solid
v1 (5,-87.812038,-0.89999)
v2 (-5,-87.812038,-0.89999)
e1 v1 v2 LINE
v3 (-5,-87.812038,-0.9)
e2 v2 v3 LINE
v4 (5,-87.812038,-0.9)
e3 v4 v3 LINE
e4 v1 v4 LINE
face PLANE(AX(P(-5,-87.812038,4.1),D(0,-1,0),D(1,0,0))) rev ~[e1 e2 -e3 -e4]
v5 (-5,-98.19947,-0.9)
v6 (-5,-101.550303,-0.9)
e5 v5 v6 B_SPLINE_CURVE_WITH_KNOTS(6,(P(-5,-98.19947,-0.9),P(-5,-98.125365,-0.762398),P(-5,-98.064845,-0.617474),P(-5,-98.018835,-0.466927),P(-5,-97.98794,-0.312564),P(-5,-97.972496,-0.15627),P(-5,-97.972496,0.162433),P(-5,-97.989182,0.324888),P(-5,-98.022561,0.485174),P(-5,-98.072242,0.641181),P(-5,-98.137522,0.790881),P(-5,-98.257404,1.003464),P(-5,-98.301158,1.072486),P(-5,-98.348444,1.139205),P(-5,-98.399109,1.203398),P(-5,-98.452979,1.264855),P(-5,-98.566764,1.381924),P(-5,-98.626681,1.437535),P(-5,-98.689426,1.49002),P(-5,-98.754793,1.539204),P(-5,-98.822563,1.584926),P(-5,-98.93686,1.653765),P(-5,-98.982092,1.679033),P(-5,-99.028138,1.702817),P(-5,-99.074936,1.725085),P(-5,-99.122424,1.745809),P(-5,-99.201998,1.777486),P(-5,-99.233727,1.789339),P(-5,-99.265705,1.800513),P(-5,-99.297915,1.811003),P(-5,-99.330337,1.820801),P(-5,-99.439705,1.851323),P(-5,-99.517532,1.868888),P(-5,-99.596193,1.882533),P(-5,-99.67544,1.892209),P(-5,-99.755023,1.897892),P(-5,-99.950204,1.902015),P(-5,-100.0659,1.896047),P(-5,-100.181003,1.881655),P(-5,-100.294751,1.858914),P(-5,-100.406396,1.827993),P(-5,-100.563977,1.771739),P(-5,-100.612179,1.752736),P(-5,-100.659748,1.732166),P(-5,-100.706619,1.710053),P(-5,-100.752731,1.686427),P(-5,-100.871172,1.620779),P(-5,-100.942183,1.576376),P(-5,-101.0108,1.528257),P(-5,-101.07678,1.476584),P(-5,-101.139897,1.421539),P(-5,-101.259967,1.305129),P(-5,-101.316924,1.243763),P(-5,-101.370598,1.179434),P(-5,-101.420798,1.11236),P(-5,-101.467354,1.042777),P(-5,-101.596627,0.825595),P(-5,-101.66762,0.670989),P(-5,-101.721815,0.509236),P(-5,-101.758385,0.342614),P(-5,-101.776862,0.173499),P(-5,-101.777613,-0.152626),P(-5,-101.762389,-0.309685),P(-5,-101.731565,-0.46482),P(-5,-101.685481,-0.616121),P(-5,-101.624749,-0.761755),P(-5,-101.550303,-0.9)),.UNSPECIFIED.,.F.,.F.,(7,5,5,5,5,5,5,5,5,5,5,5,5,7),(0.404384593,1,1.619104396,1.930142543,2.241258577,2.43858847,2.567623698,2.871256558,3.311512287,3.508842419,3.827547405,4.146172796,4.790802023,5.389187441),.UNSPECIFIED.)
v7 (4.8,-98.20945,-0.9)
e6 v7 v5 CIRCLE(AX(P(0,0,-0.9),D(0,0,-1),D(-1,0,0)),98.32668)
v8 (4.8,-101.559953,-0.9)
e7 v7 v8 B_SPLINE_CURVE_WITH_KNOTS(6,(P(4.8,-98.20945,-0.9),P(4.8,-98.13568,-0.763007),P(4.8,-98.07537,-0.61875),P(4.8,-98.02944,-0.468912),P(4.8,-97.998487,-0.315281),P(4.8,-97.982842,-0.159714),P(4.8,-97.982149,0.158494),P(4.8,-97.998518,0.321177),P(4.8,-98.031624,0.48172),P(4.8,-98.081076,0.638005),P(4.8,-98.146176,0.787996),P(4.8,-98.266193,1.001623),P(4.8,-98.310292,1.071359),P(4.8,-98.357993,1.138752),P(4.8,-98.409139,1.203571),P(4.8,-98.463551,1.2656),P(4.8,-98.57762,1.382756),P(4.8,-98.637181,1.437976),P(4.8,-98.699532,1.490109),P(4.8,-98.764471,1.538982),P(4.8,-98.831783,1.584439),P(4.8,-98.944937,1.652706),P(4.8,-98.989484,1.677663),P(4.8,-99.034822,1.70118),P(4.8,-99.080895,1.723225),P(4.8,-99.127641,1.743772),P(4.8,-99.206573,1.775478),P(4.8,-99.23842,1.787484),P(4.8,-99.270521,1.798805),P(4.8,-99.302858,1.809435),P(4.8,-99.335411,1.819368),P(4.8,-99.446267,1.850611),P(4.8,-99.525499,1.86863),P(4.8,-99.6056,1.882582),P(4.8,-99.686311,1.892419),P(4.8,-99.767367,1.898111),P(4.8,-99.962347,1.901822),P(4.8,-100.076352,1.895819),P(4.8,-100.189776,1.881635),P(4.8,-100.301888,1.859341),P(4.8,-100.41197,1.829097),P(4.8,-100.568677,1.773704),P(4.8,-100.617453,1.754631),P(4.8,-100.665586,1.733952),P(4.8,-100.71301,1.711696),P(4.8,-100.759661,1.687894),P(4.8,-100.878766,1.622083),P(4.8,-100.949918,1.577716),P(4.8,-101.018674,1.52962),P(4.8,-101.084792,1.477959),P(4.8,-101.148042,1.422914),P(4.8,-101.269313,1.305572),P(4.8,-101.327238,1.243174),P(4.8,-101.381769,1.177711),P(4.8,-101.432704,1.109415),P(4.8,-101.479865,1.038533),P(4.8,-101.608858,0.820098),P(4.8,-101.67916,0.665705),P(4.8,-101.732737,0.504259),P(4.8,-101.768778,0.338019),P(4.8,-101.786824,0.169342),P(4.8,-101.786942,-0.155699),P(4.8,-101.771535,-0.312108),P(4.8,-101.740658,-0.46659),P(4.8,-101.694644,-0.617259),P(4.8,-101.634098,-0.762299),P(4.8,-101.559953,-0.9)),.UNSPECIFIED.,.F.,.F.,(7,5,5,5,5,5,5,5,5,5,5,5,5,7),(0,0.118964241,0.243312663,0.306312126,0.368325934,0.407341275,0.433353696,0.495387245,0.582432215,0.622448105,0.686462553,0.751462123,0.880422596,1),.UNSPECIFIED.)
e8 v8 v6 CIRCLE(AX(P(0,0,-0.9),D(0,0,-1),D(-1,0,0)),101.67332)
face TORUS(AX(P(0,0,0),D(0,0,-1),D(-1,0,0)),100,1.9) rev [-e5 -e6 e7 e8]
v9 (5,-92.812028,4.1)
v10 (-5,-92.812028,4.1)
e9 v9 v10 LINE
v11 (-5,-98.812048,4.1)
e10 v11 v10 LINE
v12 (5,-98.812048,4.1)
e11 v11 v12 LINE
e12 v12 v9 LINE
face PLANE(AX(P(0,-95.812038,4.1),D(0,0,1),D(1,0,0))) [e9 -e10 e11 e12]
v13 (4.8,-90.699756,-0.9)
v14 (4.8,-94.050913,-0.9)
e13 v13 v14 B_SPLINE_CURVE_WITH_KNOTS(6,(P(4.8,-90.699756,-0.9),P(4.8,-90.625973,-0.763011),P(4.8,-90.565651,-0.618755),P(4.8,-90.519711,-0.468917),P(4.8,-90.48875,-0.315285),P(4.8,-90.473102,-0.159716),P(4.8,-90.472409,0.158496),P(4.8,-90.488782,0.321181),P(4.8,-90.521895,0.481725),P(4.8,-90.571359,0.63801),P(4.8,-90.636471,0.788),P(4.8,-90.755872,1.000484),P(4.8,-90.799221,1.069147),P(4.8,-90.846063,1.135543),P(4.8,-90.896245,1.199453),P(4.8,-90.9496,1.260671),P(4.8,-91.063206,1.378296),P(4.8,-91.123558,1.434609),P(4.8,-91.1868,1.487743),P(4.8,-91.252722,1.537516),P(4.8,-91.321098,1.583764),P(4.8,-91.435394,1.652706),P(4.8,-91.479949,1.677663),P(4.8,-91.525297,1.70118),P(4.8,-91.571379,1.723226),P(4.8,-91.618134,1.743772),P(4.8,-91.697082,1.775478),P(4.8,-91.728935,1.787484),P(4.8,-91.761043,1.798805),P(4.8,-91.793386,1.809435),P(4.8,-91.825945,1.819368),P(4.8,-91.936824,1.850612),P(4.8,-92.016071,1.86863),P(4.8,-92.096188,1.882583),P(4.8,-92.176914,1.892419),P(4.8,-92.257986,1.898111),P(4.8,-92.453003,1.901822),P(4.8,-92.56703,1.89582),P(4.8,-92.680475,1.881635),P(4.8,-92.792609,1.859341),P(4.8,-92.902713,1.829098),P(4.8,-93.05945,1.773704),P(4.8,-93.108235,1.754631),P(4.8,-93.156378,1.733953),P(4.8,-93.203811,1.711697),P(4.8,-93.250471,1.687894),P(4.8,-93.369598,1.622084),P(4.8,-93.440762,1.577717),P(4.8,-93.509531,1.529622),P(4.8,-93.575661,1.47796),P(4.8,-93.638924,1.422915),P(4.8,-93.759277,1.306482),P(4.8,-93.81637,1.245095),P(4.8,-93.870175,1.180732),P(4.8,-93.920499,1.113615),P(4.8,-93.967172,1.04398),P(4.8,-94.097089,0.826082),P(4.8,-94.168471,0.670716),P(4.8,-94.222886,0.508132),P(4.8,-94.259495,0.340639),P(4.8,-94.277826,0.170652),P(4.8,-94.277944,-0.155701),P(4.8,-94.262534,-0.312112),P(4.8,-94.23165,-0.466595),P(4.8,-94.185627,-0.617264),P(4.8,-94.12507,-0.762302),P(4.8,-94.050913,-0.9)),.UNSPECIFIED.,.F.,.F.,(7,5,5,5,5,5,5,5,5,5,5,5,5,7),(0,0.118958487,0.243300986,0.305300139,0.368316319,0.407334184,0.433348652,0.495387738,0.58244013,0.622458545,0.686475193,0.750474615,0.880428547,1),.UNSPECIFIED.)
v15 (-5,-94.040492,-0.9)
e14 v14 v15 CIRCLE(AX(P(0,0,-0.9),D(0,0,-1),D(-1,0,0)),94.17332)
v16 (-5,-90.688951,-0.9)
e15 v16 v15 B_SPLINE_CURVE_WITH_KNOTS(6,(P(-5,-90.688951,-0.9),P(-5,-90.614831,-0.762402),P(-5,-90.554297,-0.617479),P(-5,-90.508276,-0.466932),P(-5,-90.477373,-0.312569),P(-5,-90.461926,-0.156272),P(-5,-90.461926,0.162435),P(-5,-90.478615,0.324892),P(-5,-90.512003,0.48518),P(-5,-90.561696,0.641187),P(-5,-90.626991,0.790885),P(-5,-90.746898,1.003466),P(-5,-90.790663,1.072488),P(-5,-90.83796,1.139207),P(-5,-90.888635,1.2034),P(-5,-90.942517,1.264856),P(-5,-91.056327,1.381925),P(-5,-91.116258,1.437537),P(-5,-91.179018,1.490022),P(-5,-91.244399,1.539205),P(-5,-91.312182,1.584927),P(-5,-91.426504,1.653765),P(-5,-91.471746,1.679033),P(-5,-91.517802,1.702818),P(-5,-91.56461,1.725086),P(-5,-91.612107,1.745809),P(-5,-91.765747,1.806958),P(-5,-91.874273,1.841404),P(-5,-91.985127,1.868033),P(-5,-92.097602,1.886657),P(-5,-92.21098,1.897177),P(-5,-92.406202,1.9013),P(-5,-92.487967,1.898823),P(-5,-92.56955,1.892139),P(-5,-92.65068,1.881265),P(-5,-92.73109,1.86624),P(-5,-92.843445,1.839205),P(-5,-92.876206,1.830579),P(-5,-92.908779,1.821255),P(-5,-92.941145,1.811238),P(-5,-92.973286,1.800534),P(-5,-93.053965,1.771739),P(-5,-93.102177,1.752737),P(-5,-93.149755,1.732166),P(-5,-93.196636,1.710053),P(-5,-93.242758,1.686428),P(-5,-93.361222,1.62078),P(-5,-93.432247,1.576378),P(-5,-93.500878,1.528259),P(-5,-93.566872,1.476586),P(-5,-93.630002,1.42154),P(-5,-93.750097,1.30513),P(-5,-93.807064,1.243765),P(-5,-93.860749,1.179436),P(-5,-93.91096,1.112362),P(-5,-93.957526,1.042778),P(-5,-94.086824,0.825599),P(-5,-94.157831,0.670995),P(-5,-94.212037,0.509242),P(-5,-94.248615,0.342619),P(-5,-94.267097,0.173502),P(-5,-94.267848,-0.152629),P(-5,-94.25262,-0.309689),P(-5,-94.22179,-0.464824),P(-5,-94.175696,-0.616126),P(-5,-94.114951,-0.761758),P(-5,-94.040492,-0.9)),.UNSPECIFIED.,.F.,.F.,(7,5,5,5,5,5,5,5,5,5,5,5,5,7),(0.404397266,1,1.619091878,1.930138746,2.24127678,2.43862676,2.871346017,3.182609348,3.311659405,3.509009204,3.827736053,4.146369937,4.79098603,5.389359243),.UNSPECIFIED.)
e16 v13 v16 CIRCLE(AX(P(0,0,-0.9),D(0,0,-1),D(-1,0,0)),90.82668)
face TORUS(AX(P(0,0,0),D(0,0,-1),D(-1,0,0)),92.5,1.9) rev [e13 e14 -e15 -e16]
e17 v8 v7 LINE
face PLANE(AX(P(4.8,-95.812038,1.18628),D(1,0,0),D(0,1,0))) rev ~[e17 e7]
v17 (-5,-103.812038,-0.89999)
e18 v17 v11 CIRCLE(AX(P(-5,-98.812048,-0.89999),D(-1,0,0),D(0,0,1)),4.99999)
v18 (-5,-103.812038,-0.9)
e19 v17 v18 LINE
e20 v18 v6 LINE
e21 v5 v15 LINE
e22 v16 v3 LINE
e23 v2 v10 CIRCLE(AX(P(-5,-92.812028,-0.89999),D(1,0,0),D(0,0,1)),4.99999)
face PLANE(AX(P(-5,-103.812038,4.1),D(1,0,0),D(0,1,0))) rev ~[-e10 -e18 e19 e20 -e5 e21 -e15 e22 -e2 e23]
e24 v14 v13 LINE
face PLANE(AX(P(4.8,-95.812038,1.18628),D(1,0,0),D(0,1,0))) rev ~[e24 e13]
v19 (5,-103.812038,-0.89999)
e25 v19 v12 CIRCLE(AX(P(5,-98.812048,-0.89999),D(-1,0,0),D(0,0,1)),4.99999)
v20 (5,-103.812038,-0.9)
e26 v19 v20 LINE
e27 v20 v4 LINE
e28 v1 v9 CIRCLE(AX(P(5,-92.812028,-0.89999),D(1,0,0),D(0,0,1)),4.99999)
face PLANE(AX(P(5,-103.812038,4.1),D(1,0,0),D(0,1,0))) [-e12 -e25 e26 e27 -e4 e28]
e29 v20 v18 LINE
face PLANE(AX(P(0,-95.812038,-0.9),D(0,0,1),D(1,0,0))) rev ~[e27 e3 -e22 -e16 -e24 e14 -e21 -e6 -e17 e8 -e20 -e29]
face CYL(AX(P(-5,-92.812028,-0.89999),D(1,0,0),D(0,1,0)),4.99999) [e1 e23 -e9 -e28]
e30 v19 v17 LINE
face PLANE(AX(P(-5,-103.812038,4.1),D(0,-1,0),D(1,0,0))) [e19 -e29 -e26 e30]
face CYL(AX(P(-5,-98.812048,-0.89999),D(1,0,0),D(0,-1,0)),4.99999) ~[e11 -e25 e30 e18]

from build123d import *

# Parameters (mm, degrees)
F5_W      = 10
F5_H      = 16
F6_DEPTH  = 5
F0_R      = 1.9
F2_R      = 1.9
F9_R      = 4.99999
F11_DEPTH = 0.2


# Not quite as in the source:
# - a fillet or chamfer is up to 0.001 mm smaller than in the source, because OpenCascade refuses the exact size


with BuildPart() as f6:
    # F5 (on offset) → F6 (new body)
    with BuildSketch(Plane.XY.offset(4.1)):
        with Locations((0, -95.8120375872)):
            Rectangle(F5_W, F5_H)
    extrude(amount=-F6_DEPTH)

    # F0 (on Front) → F7 (revolve, cut)
    with BuildSketch(Plane.XZ):
        with Locations((-92.5, 0)):
            Circle(F0_R)
    revolve(axis=Axis((0, 0, 0), (0, 0, 1)), mode=Mode.SUBTRACT)

    # F2 (on Front) → F8 (revolve, cut)
    with BuildSketch(Plane.XZ):
        with Locations((-100, 0)):
            Circle(F2_R)
    revolve(axis=Axis((0, 0, 0), (0, 0, 1)), mode=Mode.SUBTRACT)

    # F9 (radius 5 in the source; OpenCascade refuses exactly that, so slightly less here)
    f9_edges = [f6.edges().sort_by_distance(p)[0] for p in [
        (0, -103.812038, 4.1),
        (0, -87.812038, 4.1),
    ]]
    fillet(f9_edges, radius=F9_R)

    # F10 (on face) → F11 (join)
    with BuildSketch(Plane.YZ.offset(5)):
        with BuildLine():
            Line((-92.8120375872, 4.1), (-98.8120375872, 4.1))
            ThreePointArc((-98.8120375872, 4.1), (-102.3475714931, 2.6355339059), (-103.8120375872, -0.9))
            Line((-103.8120375872, -0.9), (-87.8120375872, -0.9))
            ThreePointArc((-87.8120375872, -0.9), (-89.2765036812, 2.6355339059), (-92.8120375872, 4.1))
        make_face()
    extrude(amount=-F11_DEPTH)


solid = f6.part
